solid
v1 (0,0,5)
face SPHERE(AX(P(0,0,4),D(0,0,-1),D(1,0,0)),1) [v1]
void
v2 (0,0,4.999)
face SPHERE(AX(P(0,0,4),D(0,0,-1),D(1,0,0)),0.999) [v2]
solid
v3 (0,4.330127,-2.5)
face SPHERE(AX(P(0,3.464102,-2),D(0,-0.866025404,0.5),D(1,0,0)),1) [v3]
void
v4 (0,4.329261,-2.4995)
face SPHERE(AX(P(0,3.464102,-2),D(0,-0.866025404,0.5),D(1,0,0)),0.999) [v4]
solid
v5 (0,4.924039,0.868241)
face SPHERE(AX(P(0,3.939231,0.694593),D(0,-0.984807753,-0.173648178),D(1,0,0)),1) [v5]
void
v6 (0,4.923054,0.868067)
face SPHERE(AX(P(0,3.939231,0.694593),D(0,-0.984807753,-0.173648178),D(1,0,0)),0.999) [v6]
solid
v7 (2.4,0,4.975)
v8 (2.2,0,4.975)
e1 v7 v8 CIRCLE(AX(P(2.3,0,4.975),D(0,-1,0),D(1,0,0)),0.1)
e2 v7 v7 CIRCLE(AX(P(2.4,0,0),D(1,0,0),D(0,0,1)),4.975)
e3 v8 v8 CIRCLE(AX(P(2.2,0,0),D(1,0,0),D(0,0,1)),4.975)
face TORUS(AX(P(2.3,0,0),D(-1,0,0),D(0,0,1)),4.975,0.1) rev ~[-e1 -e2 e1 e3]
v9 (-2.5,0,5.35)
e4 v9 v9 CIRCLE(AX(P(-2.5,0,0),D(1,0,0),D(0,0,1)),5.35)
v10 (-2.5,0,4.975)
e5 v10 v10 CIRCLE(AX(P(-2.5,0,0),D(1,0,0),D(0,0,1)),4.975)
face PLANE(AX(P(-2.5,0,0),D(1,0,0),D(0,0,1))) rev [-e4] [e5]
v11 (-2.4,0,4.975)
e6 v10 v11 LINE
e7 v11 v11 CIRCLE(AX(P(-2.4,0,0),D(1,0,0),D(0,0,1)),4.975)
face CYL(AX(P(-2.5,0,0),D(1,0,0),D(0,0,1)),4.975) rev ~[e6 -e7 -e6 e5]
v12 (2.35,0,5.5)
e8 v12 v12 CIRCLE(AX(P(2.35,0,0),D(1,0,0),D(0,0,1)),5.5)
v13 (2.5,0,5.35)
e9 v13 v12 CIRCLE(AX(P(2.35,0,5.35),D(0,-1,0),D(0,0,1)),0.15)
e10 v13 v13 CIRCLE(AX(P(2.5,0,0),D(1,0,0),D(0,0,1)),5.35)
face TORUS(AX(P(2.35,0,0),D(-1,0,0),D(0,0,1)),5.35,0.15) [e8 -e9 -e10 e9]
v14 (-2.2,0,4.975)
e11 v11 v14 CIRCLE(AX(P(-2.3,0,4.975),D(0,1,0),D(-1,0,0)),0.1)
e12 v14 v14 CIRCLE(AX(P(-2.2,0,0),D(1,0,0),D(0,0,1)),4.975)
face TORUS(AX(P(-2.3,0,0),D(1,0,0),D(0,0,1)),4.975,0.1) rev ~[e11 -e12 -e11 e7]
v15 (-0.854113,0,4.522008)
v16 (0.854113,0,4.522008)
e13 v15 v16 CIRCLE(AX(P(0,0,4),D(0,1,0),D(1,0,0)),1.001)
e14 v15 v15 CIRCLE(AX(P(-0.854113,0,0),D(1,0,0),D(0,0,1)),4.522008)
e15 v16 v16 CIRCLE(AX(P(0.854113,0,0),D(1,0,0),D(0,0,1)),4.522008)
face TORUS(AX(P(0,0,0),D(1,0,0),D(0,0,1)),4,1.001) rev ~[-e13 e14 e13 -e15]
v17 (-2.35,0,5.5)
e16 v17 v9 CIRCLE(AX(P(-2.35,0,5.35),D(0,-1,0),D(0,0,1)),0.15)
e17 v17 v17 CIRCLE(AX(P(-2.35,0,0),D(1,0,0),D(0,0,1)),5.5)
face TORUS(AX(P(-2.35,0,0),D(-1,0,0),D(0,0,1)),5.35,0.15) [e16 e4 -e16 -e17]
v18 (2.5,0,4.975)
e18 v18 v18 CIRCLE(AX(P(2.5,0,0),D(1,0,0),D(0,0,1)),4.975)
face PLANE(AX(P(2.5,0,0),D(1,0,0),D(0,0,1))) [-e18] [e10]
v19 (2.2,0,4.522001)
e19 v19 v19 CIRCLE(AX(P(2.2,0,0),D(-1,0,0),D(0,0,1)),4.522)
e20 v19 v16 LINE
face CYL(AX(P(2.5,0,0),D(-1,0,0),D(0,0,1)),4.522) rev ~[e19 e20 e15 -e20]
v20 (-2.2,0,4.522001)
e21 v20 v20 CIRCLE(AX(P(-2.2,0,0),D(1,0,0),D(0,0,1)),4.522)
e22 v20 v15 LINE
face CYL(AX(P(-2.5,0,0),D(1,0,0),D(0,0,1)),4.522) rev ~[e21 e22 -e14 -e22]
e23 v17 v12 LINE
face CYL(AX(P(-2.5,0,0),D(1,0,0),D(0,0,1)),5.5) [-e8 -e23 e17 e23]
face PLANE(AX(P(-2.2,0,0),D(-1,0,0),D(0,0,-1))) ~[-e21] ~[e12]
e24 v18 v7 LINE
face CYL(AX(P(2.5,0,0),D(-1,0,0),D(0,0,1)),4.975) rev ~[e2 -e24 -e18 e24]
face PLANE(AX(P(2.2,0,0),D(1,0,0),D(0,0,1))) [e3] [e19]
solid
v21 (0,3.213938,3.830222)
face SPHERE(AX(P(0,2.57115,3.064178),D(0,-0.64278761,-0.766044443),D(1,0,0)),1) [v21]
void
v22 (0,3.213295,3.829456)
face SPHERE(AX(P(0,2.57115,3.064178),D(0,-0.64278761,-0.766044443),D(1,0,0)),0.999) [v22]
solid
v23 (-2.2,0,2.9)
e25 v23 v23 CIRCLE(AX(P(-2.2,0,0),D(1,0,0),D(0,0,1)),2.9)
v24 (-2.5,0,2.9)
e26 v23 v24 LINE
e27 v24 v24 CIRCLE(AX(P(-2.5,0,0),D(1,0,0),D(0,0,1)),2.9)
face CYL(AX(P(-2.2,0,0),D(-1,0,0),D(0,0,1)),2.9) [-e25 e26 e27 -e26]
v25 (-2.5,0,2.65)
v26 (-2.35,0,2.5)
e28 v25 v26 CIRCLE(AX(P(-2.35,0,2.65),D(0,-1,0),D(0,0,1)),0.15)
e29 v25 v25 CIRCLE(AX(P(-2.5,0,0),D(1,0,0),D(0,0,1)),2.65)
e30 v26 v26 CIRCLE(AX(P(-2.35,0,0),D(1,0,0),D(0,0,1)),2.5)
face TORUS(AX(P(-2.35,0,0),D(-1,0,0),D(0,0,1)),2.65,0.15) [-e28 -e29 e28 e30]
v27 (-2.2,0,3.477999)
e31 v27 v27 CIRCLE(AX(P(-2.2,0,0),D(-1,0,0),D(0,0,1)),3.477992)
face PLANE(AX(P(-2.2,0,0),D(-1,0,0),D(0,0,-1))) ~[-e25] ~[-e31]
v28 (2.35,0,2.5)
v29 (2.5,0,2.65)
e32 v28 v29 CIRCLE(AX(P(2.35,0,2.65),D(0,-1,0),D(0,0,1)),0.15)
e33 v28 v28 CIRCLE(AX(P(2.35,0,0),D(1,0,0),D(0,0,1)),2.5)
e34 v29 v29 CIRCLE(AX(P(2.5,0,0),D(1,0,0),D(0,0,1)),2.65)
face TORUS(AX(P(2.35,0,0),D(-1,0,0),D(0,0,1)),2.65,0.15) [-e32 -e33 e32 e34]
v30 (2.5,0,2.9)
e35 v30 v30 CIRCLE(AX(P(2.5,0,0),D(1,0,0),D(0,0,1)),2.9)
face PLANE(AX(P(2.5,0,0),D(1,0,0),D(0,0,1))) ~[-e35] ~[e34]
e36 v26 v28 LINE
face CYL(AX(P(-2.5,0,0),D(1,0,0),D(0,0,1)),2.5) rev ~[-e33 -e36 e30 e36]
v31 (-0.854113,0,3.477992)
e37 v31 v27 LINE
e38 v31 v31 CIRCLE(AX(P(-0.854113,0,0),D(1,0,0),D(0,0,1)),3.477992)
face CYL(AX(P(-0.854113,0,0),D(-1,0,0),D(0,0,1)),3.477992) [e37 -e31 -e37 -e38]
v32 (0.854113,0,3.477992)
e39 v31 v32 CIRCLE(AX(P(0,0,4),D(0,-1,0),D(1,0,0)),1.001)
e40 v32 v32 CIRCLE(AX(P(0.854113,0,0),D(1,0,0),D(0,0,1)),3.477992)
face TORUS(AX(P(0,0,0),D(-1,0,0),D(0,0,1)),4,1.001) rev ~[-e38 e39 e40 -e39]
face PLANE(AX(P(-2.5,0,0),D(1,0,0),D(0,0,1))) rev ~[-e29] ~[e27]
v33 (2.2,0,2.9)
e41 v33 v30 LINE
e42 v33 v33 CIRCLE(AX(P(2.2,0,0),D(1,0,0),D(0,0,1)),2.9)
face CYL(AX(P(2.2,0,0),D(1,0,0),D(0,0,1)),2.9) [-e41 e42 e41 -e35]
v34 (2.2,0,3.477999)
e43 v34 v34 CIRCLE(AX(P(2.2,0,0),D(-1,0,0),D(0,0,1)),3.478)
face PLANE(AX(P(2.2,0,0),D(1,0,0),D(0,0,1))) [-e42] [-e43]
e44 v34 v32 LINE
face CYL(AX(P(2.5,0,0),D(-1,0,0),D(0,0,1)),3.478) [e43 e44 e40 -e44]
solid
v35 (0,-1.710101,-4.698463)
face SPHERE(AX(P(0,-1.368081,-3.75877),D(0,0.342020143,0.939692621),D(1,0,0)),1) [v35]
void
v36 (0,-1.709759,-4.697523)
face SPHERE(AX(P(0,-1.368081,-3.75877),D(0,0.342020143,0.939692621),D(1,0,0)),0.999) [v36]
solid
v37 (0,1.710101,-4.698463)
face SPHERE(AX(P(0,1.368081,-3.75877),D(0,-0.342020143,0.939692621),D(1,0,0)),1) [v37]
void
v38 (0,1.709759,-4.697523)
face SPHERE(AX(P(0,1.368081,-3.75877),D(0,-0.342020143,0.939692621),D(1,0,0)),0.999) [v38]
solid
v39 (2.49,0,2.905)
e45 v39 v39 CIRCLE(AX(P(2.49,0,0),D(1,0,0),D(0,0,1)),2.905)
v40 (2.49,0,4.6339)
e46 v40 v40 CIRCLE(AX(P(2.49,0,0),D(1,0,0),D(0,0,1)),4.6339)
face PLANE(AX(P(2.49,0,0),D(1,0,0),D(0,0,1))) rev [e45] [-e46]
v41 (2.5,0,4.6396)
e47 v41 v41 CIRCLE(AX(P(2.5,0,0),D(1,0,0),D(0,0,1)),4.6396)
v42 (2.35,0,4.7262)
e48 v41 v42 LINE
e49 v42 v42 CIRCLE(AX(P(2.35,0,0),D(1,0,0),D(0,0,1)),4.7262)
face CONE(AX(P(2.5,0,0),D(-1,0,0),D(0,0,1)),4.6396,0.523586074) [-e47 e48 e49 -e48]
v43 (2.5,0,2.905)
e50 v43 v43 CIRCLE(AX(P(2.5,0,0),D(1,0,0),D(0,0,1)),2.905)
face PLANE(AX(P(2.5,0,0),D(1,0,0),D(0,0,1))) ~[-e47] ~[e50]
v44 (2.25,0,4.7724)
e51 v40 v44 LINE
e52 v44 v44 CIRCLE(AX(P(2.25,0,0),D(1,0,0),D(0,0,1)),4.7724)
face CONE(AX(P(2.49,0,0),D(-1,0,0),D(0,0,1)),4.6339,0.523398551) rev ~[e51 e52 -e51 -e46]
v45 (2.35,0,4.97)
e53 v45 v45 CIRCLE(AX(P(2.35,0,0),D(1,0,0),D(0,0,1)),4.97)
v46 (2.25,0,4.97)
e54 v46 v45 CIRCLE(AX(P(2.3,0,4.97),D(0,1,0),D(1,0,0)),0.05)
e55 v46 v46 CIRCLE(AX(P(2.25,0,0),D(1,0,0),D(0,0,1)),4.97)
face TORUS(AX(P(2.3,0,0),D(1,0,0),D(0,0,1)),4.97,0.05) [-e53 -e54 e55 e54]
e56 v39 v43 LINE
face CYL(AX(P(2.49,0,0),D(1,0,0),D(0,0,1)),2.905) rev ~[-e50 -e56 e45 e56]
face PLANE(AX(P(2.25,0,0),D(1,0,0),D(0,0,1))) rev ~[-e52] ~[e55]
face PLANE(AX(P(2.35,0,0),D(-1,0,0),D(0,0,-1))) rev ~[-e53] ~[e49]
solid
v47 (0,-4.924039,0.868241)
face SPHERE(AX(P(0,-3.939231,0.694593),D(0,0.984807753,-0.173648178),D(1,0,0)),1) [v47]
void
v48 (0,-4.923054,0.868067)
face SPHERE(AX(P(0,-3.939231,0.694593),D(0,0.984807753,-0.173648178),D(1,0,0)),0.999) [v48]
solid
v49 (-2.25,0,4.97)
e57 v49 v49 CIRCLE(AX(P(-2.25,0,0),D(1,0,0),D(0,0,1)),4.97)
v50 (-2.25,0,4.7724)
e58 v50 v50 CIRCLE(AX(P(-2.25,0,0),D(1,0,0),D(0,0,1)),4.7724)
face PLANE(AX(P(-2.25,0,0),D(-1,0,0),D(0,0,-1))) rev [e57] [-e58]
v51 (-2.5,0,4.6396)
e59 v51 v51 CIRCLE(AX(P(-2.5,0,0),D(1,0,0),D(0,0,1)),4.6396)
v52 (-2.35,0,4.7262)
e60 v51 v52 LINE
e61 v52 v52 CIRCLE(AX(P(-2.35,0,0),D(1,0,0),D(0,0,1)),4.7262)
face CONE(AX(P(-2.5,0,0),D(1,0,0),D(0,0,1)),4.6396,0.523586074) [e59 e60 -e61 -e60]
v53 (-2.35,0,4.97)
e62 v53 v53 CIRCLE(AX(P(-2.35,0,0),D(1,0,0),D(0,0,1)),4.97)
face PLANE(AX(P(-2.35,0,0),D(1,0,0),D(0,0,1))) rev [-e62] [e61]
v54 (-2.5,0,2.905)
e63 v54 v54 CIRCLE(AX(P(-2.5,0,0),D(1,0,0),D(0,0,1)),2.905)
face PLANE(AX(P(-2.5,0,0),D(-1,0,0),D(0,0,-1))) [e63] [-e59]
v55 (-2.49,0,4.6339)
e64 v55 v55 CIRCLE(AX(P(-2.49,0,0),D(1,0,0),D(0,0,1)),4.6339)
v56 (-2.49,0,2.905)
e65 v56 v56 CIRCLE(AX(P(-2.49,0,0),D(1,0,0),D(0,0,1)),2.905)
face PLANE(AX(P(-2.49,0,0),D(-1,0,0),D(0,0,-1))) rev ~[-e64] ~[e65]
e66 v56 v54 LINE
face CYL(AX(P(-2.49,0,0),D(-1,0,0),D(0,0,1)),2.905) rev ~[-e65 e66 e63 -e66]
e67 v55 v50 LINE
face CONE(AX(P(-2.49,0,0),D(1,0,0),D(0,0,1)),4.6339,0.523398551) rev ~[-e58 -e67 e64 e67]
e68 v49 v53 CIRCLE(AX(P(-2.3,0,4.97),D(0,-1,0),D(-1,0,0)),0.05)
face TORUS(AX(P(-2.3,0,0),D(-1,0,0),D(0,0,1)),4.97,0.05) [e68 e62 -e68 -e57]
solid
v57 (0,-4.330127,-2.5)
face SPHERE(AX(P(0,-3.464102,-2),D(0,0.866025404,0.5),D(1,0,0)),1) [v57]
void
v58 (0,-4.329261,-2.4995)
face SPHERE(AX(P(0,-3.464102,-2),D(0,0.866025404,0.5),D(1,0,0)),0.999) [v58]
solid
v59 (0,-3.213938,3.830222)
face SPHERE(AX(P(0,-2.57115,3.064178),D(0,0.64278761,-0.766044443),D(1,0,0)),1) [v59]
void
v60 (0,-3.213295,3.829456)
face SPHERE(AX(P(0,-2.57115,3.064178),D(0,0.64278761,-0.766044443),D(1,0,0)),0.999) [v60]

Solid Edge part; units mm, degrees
sketch "Sketch1" plane through (0, 0, 0) normal (0, -1, 0) x (1, 0, 0)
  arc A0 (0, 5) -> (0, 3) centre (0, 4) cw
  dimension "D1" = 1
revolve "RevolvedProtrusion1" add sketch "Sketch1" angle 360 about axis through (0, 0, 30.6346) along (0, 0, 1)
shell "Thinwall1" thickness 0.001 removed faces 0
pattern_circular "Pattern1" count 9 over 360 about axis through (0, 0, 0) along (1, 0, 0) of "RevolvedProtrusion1", "Thinwall1"
sketch "Sketch2" plane through (0, 0, 0) normal (0, -1, 0) x (1, 0, 0)
  line L0 (-2.5, 3.478) -> (-2.5, 2.5)
  line L1 (-2.5, 2.5) -> (2.5, 2.5)
  line L2 (2.5, 2.5) -> (2.5, 3.478)
  line L3 (2.5, 3.478) -> (0.8541, 3.478)
  arc A0 (-0.8541, 3.478) -> (0.8541, 3.478) centre (0, 4) ccw
  line L4 (-0.8541, 3.478) -> (-2.5, 3.478)
  line L5 (-2.5, 4.522) -> (-0.8541, 4.522)
  arc A1 (-0.8541, 4.522) -> (0.8541, 4.522) centre (0, 4) cw
  line L6 (2.5, 4.522) -> (0.8541, 4.522)
  line L7 (2.5, 5.5) -> (2.5, 4.522)
  line L8 (-2.5, 5.5) -> (2.5, 5.5)
  line L9 (-2.5, 4.522) -> (-2.5, 5.5)
  dimension "D1" = 5
  dimension "D2" = 1.001
  dimension "D3" = 1.001
revolve "RevolvedProtrusion2" add sketch "Sketch2" angle 360 about axis through (-60, 0, 0) along (1, 0, 0)
fillet "Round1" radius 0.15 4 edges at (-2.5, 0, -5.5) (2.5, 0, -5.5) (2.5, 0, -2.5) (-2.5, 0, -2.5)
sketch "Sketch3" plane through (0, 0, 0) normal (0, -1, 0) x (1, 0, 0)
  line L0 (2.5, 4.975) -> (2.4, 4.975)
  arc A0 (2.4, 4.975) -> (2.2, 4.975) centre (2.3, 4.975) ccw
  line L1 (2.2, 4.975) -> (2.2, 2.9)
  line L2 (2.2, 2.9) -> (2.5, 2.9)
  line L3 (2.5, 2.9) -> (2.5, 4.975)
  dimension "D1" = 0.1
  dimension "D2" = 0.3
  dimension "D3" = 2.5
revolve "RevolvedCutout1" cut sketch "Sketch3" angle 360 about axis through (-60, 0, 0) along (1, 0, 0)
sketch "Sketch4" plane through (0, 0, 0) normal (0, -1, 0) x (1, 0, 0)
  line L0 (2.49, 2.905) -> (2.5, 2.905)
  line L1 (2.5, 2.905) -> (2.5, 4.6396)
  line L2 (2.5, 4.6396) -> (2.35, 4.7262)
  line L3 (2.35, 4.7262) -> (2.35, 4.97)
  arc A0 (2.25, 4.97) -> (2.35, 4.97) centre (2.3, 4.97) cw
  line L4 (2.25, 4.97) -> (2.25, 4.7724)
  line L5 (2.49, 4.6339) -> (2.25, 4.7724)
  line L6 (2.49, 2.905) -> (2.49, 4.6339)
  dimension "D1" = 0.05
  dimension "D2" = 0.01
  dimension "D3" = 0.01
  dimension "D4" = 2.35
  dimension "D5" = 2.5
revolve "RevolvedProtrusion3" add sketch "Sketch4" angle 360 about axis through (-60, 0, 0) along (1, 0, 0)
mirror "Mirror1" about plane through (0, 0, 0) normal (1, 0, 0) of "RevolvedCutout1", "RevolvedProtrusion3"
properties material "Stahl"
